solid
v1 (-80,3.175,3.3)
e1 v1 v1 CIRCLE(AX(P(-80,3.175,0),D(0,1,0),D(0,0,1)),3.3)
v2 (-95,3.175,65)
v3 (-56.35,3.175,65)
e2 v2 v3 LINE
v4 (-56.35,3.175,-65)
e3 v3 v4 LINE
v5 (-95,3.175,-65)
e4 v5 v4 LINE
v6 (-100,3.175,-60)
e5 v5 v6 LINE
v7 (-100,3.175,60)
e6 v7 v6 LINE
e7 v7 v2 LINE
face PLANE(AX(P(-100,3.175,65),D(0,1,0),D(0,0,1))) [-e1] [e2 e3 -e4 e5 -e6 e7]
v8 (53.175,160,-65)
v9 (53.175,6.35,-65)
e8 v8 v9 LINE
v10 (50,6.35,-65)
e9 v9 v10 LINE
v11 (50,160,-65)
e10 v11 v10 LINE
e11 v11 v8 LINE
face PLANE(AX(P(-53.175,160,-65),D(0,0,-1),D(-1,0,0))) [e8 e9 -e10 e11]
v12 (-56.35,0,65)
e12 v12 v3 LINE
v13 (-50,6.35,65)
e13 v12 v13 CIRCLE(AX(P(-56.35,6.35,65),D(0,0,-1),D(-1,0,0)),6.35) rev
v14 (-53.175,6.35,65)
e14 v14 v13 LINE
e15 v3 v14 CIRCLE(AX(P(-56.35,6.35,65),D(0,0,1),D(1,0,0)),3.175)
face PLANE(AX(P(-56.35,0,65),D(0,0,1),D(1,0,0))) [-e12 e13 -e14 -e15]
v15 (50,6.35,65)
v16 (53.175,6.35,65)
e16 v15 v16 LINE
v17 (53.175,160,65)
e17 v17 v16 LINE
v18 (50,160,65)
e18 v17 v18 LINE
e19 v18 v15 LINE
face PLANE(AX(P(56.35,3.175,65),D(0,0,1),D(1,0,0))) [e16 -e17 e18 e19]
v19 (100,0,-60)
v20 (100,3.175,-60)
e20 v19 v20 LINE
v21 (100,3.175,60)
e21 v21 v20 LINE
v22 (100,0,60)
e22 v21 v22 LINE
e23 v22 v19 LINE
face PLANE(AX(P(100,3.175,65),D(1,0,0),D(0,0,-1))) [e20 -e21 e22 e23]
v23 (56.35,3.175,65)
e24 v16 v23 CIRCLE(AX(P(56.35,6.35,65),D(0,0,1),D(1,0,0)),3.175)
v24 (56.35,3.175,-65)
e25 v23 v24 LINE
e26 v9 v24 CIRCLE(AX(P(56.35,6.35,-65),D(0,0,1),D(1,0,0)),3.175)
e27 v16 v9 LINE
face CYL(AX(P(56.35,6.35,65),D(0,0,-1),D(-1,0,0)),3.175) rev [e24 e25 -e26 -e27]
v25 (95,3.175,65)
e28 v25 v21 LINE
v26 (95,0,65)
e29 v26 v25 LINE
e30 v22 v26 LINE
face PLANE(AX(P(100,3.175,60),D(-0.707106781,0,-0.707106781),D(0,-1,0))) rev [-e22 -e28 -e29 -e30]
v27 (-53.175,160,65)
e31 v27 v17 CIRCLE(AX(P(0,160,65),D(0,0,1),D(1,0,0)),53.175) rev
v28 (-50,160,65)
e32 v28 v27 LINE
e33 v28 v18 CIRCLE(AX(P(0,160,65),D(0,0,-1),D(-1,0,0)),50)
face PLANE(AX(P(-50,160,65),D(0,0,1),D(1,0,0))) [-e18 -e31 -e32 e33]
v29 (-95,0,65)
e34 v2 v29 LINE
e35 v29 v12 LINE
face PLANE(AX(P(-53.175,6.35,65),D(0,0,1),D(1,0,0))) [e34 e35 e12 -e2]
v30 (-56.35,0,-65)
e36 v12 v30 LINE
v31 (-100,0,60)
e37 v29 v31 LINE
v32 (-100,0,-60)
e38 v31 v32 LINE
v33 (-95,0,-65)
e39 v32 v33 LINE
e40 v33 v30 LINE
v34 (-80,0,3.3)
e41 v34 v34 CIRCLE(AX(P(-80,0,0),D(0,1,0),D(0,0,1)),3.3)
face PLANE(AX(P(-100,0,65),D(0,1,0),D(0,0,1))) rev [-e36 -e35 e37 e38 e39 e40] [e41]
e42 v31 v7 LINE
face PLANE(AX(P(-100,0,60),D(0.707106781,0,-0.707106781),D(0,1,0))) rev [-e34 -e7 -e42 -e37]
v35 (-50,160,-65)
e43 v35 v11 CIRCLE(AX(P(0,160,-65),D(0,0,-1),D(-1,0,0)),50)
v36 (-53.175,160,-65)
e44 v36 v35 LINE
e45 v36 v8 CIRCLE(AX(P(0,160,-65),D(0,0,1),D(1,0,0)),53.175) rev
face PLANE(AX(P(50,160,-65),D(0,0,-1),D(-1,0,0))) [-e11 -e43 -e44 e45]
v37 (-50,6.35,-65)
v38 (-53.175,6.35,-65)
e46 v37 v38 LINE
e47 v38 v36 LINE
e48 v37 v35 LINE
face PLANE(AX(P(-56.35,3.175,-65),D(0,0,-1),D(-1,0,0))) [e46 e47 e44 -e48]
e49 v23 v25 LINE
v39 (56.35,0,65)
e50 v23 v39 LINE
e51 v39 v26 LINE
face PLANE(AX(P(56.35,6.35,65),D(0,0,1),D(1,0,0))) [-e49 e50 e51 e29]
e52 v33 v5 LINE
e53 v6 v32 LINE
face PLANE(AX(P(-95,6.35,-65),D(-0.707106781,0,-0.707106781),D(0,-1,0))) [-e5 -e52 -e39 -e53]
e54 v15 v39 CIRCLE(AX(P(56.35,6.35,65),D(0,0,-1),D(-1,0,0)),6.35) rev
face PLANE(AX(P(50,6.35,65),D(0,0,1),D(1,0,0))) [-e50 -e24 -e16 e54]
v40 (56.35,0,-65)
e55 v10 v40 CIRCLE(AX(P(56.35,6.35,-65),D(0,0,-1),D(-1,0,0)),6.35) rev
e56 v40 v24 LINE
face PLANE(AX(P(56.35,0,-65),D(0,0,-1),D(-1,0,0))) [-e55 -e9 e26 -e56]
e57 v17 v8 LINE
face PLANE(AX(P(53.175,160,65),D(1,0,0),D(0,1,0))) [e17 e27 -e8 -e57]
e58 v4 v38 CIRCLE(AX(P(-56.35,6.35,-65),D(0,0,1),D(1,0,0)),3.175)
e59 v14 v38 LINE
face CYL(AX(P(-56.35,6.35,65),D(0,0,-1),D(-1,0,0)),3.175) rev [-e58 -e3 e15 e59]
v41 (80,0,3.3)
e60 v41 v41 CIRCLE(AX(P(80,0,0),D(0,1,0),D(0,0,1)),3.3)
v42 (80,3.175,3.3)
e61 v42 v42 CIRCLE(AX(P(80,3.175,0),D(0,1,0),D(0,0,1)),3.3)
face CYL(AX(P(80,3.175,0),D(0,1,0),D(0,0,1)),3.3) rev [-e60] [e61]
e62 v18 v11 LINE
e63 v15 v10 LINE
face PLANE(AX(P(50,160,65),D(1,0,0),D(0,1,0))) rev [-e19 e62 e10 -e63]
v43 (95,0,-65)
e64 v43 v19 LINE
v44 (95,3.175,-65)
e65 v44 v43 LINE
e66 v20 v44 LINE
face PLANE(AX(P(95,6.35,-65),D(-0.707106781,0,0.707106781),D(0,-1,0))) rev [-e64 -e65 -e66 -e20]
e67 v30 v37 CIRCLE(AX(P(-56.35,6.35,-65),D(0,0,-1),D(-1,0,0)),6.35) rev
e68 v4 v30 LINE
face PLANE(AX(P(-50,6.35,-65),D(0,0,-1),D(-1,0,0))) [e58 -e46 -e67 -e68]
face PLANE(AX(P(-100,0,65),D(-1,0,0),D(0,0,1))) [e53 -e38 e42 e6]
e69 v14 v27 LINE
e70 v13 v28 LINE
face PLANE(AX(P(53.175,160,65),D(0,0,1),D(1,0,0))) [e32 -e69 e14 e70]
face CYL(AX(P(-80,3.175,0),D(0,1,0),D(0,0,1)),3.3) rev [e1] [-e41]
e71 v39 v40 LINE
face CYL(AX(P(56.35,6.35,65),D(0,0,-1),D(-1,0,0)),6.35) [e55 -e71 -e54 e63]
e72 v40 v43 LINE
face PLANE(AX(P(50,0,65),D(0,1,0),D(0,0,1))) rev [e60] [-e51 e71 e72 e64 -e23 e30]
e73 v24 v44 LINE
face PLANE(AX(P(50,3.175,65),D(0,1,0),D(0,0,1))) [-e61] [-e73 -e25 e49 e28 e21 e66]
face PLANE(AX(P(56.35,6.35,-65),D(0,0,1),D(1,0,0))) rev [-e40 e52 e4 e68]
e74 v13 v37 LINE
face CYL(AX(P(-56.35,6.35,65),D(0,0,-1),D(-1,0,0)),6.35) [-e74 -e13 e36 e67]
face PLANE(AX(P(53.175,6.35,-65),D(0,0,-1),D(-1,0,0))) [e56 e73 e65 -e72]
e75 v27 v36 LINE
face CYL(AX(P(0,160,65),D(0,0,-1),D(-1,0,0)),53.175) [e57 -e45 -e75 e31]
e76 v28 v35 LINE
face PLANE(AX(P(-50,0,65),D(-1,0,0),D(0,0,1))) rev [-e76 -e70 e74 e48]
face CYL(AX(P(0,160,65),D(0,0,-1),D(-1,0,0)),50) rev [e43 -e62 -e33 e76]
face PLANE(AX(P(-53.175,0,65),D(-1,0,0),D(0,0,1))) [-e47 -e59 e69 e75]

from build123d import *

# Parameters (mm, degrees)
BASE_FLANGE1_DEPTH         = 65
F_6_6_6_6_DIAMETER_HOLE1_D = 6.6
BREAK_CORNER1_DEPTH        = 3.175


# Read off the part's stored shape, not the designer's step: Break-Corner1
# Sheet-metal steps are written as plain solids
with BuildPart() as part:
    # Sketch1 → Base-Flange1 (new, symmetric)
    with BuildSketch(Plane.XY):
        with BuildLine():
            Line((-100, 0), (-56.35, 0))
            ThreePointArc((-56.35, 0), (-51.859871939, 1.859871939), (-50, 6.35))
            Line((-50, 6.35), (-50, 160))
            ThreePointArc((-50, 160), (0, 210), (50, 160))
            Line((50, 160), (50, 6.35))
            ThreePointArc((50, 6.35), (51.859871939, 1.859871939), (56.35, 0))
            Line((56.35, 0), (100, 0))
            Line((100, 0), (100, 3.175))
            Line((100, 3.175), (56.35, 3.175))
            ThreePointArc((56.35, 3.175), (54.10493597, 4.10493597), (53.175, 6.35))
            Line((53.175, 6.35), (53.175, 160))
            ThreePointArc((53.175, 160), (0, 213.175), (-53.175, 160))
            Line((-53.175, 160), (-53.175, 6.35))
            ThreePointArc((-53.175, 6.35), (-54.10493597, 4.10493597), (-56.35, 3.175))
            Line((-56.35, 3.175), (-100, 3.175))
            Line((-100, 3.175), (-100, 0))
        make_face()
    extrude(amount=BASE_FLANGE1_DEPTH, both=True)

    # Ø6.6 (6.6) Diameter Hole1 (through all)
    with Locations(Plane(origin=(0, 3.175, 0), x_dir=(1, 0, 0), z_dir=(0, 1, 0))):
        with Locations((-80, 0), (80, 0)):
            Hole(F_6_6_6_6_DIAMETER_HOLE1_D / 2)

    # Break-Corner1 outline → Break-Corner1 (cut)
    with BuildSketch(Plane(origin=(0, 0, 0), x_dir=(1, 0, 0), z_dir=(0, 1, 0))):
        Polygon((-100, -65), (-95, -65), (-100, -60), align=None)
        Polygon((-100, 65), (-100, 60), (-95, 65), align=None)
        Polygon((100, -65), (100, -60), (95, -65), align=None)
        Polygon((95, 65), (100, 60), (100, 65), align=None)
    extrude(amount=BREAK_CORNER1_DEPTH, mode=Mode.SUBTRACT)


solid = part.part
